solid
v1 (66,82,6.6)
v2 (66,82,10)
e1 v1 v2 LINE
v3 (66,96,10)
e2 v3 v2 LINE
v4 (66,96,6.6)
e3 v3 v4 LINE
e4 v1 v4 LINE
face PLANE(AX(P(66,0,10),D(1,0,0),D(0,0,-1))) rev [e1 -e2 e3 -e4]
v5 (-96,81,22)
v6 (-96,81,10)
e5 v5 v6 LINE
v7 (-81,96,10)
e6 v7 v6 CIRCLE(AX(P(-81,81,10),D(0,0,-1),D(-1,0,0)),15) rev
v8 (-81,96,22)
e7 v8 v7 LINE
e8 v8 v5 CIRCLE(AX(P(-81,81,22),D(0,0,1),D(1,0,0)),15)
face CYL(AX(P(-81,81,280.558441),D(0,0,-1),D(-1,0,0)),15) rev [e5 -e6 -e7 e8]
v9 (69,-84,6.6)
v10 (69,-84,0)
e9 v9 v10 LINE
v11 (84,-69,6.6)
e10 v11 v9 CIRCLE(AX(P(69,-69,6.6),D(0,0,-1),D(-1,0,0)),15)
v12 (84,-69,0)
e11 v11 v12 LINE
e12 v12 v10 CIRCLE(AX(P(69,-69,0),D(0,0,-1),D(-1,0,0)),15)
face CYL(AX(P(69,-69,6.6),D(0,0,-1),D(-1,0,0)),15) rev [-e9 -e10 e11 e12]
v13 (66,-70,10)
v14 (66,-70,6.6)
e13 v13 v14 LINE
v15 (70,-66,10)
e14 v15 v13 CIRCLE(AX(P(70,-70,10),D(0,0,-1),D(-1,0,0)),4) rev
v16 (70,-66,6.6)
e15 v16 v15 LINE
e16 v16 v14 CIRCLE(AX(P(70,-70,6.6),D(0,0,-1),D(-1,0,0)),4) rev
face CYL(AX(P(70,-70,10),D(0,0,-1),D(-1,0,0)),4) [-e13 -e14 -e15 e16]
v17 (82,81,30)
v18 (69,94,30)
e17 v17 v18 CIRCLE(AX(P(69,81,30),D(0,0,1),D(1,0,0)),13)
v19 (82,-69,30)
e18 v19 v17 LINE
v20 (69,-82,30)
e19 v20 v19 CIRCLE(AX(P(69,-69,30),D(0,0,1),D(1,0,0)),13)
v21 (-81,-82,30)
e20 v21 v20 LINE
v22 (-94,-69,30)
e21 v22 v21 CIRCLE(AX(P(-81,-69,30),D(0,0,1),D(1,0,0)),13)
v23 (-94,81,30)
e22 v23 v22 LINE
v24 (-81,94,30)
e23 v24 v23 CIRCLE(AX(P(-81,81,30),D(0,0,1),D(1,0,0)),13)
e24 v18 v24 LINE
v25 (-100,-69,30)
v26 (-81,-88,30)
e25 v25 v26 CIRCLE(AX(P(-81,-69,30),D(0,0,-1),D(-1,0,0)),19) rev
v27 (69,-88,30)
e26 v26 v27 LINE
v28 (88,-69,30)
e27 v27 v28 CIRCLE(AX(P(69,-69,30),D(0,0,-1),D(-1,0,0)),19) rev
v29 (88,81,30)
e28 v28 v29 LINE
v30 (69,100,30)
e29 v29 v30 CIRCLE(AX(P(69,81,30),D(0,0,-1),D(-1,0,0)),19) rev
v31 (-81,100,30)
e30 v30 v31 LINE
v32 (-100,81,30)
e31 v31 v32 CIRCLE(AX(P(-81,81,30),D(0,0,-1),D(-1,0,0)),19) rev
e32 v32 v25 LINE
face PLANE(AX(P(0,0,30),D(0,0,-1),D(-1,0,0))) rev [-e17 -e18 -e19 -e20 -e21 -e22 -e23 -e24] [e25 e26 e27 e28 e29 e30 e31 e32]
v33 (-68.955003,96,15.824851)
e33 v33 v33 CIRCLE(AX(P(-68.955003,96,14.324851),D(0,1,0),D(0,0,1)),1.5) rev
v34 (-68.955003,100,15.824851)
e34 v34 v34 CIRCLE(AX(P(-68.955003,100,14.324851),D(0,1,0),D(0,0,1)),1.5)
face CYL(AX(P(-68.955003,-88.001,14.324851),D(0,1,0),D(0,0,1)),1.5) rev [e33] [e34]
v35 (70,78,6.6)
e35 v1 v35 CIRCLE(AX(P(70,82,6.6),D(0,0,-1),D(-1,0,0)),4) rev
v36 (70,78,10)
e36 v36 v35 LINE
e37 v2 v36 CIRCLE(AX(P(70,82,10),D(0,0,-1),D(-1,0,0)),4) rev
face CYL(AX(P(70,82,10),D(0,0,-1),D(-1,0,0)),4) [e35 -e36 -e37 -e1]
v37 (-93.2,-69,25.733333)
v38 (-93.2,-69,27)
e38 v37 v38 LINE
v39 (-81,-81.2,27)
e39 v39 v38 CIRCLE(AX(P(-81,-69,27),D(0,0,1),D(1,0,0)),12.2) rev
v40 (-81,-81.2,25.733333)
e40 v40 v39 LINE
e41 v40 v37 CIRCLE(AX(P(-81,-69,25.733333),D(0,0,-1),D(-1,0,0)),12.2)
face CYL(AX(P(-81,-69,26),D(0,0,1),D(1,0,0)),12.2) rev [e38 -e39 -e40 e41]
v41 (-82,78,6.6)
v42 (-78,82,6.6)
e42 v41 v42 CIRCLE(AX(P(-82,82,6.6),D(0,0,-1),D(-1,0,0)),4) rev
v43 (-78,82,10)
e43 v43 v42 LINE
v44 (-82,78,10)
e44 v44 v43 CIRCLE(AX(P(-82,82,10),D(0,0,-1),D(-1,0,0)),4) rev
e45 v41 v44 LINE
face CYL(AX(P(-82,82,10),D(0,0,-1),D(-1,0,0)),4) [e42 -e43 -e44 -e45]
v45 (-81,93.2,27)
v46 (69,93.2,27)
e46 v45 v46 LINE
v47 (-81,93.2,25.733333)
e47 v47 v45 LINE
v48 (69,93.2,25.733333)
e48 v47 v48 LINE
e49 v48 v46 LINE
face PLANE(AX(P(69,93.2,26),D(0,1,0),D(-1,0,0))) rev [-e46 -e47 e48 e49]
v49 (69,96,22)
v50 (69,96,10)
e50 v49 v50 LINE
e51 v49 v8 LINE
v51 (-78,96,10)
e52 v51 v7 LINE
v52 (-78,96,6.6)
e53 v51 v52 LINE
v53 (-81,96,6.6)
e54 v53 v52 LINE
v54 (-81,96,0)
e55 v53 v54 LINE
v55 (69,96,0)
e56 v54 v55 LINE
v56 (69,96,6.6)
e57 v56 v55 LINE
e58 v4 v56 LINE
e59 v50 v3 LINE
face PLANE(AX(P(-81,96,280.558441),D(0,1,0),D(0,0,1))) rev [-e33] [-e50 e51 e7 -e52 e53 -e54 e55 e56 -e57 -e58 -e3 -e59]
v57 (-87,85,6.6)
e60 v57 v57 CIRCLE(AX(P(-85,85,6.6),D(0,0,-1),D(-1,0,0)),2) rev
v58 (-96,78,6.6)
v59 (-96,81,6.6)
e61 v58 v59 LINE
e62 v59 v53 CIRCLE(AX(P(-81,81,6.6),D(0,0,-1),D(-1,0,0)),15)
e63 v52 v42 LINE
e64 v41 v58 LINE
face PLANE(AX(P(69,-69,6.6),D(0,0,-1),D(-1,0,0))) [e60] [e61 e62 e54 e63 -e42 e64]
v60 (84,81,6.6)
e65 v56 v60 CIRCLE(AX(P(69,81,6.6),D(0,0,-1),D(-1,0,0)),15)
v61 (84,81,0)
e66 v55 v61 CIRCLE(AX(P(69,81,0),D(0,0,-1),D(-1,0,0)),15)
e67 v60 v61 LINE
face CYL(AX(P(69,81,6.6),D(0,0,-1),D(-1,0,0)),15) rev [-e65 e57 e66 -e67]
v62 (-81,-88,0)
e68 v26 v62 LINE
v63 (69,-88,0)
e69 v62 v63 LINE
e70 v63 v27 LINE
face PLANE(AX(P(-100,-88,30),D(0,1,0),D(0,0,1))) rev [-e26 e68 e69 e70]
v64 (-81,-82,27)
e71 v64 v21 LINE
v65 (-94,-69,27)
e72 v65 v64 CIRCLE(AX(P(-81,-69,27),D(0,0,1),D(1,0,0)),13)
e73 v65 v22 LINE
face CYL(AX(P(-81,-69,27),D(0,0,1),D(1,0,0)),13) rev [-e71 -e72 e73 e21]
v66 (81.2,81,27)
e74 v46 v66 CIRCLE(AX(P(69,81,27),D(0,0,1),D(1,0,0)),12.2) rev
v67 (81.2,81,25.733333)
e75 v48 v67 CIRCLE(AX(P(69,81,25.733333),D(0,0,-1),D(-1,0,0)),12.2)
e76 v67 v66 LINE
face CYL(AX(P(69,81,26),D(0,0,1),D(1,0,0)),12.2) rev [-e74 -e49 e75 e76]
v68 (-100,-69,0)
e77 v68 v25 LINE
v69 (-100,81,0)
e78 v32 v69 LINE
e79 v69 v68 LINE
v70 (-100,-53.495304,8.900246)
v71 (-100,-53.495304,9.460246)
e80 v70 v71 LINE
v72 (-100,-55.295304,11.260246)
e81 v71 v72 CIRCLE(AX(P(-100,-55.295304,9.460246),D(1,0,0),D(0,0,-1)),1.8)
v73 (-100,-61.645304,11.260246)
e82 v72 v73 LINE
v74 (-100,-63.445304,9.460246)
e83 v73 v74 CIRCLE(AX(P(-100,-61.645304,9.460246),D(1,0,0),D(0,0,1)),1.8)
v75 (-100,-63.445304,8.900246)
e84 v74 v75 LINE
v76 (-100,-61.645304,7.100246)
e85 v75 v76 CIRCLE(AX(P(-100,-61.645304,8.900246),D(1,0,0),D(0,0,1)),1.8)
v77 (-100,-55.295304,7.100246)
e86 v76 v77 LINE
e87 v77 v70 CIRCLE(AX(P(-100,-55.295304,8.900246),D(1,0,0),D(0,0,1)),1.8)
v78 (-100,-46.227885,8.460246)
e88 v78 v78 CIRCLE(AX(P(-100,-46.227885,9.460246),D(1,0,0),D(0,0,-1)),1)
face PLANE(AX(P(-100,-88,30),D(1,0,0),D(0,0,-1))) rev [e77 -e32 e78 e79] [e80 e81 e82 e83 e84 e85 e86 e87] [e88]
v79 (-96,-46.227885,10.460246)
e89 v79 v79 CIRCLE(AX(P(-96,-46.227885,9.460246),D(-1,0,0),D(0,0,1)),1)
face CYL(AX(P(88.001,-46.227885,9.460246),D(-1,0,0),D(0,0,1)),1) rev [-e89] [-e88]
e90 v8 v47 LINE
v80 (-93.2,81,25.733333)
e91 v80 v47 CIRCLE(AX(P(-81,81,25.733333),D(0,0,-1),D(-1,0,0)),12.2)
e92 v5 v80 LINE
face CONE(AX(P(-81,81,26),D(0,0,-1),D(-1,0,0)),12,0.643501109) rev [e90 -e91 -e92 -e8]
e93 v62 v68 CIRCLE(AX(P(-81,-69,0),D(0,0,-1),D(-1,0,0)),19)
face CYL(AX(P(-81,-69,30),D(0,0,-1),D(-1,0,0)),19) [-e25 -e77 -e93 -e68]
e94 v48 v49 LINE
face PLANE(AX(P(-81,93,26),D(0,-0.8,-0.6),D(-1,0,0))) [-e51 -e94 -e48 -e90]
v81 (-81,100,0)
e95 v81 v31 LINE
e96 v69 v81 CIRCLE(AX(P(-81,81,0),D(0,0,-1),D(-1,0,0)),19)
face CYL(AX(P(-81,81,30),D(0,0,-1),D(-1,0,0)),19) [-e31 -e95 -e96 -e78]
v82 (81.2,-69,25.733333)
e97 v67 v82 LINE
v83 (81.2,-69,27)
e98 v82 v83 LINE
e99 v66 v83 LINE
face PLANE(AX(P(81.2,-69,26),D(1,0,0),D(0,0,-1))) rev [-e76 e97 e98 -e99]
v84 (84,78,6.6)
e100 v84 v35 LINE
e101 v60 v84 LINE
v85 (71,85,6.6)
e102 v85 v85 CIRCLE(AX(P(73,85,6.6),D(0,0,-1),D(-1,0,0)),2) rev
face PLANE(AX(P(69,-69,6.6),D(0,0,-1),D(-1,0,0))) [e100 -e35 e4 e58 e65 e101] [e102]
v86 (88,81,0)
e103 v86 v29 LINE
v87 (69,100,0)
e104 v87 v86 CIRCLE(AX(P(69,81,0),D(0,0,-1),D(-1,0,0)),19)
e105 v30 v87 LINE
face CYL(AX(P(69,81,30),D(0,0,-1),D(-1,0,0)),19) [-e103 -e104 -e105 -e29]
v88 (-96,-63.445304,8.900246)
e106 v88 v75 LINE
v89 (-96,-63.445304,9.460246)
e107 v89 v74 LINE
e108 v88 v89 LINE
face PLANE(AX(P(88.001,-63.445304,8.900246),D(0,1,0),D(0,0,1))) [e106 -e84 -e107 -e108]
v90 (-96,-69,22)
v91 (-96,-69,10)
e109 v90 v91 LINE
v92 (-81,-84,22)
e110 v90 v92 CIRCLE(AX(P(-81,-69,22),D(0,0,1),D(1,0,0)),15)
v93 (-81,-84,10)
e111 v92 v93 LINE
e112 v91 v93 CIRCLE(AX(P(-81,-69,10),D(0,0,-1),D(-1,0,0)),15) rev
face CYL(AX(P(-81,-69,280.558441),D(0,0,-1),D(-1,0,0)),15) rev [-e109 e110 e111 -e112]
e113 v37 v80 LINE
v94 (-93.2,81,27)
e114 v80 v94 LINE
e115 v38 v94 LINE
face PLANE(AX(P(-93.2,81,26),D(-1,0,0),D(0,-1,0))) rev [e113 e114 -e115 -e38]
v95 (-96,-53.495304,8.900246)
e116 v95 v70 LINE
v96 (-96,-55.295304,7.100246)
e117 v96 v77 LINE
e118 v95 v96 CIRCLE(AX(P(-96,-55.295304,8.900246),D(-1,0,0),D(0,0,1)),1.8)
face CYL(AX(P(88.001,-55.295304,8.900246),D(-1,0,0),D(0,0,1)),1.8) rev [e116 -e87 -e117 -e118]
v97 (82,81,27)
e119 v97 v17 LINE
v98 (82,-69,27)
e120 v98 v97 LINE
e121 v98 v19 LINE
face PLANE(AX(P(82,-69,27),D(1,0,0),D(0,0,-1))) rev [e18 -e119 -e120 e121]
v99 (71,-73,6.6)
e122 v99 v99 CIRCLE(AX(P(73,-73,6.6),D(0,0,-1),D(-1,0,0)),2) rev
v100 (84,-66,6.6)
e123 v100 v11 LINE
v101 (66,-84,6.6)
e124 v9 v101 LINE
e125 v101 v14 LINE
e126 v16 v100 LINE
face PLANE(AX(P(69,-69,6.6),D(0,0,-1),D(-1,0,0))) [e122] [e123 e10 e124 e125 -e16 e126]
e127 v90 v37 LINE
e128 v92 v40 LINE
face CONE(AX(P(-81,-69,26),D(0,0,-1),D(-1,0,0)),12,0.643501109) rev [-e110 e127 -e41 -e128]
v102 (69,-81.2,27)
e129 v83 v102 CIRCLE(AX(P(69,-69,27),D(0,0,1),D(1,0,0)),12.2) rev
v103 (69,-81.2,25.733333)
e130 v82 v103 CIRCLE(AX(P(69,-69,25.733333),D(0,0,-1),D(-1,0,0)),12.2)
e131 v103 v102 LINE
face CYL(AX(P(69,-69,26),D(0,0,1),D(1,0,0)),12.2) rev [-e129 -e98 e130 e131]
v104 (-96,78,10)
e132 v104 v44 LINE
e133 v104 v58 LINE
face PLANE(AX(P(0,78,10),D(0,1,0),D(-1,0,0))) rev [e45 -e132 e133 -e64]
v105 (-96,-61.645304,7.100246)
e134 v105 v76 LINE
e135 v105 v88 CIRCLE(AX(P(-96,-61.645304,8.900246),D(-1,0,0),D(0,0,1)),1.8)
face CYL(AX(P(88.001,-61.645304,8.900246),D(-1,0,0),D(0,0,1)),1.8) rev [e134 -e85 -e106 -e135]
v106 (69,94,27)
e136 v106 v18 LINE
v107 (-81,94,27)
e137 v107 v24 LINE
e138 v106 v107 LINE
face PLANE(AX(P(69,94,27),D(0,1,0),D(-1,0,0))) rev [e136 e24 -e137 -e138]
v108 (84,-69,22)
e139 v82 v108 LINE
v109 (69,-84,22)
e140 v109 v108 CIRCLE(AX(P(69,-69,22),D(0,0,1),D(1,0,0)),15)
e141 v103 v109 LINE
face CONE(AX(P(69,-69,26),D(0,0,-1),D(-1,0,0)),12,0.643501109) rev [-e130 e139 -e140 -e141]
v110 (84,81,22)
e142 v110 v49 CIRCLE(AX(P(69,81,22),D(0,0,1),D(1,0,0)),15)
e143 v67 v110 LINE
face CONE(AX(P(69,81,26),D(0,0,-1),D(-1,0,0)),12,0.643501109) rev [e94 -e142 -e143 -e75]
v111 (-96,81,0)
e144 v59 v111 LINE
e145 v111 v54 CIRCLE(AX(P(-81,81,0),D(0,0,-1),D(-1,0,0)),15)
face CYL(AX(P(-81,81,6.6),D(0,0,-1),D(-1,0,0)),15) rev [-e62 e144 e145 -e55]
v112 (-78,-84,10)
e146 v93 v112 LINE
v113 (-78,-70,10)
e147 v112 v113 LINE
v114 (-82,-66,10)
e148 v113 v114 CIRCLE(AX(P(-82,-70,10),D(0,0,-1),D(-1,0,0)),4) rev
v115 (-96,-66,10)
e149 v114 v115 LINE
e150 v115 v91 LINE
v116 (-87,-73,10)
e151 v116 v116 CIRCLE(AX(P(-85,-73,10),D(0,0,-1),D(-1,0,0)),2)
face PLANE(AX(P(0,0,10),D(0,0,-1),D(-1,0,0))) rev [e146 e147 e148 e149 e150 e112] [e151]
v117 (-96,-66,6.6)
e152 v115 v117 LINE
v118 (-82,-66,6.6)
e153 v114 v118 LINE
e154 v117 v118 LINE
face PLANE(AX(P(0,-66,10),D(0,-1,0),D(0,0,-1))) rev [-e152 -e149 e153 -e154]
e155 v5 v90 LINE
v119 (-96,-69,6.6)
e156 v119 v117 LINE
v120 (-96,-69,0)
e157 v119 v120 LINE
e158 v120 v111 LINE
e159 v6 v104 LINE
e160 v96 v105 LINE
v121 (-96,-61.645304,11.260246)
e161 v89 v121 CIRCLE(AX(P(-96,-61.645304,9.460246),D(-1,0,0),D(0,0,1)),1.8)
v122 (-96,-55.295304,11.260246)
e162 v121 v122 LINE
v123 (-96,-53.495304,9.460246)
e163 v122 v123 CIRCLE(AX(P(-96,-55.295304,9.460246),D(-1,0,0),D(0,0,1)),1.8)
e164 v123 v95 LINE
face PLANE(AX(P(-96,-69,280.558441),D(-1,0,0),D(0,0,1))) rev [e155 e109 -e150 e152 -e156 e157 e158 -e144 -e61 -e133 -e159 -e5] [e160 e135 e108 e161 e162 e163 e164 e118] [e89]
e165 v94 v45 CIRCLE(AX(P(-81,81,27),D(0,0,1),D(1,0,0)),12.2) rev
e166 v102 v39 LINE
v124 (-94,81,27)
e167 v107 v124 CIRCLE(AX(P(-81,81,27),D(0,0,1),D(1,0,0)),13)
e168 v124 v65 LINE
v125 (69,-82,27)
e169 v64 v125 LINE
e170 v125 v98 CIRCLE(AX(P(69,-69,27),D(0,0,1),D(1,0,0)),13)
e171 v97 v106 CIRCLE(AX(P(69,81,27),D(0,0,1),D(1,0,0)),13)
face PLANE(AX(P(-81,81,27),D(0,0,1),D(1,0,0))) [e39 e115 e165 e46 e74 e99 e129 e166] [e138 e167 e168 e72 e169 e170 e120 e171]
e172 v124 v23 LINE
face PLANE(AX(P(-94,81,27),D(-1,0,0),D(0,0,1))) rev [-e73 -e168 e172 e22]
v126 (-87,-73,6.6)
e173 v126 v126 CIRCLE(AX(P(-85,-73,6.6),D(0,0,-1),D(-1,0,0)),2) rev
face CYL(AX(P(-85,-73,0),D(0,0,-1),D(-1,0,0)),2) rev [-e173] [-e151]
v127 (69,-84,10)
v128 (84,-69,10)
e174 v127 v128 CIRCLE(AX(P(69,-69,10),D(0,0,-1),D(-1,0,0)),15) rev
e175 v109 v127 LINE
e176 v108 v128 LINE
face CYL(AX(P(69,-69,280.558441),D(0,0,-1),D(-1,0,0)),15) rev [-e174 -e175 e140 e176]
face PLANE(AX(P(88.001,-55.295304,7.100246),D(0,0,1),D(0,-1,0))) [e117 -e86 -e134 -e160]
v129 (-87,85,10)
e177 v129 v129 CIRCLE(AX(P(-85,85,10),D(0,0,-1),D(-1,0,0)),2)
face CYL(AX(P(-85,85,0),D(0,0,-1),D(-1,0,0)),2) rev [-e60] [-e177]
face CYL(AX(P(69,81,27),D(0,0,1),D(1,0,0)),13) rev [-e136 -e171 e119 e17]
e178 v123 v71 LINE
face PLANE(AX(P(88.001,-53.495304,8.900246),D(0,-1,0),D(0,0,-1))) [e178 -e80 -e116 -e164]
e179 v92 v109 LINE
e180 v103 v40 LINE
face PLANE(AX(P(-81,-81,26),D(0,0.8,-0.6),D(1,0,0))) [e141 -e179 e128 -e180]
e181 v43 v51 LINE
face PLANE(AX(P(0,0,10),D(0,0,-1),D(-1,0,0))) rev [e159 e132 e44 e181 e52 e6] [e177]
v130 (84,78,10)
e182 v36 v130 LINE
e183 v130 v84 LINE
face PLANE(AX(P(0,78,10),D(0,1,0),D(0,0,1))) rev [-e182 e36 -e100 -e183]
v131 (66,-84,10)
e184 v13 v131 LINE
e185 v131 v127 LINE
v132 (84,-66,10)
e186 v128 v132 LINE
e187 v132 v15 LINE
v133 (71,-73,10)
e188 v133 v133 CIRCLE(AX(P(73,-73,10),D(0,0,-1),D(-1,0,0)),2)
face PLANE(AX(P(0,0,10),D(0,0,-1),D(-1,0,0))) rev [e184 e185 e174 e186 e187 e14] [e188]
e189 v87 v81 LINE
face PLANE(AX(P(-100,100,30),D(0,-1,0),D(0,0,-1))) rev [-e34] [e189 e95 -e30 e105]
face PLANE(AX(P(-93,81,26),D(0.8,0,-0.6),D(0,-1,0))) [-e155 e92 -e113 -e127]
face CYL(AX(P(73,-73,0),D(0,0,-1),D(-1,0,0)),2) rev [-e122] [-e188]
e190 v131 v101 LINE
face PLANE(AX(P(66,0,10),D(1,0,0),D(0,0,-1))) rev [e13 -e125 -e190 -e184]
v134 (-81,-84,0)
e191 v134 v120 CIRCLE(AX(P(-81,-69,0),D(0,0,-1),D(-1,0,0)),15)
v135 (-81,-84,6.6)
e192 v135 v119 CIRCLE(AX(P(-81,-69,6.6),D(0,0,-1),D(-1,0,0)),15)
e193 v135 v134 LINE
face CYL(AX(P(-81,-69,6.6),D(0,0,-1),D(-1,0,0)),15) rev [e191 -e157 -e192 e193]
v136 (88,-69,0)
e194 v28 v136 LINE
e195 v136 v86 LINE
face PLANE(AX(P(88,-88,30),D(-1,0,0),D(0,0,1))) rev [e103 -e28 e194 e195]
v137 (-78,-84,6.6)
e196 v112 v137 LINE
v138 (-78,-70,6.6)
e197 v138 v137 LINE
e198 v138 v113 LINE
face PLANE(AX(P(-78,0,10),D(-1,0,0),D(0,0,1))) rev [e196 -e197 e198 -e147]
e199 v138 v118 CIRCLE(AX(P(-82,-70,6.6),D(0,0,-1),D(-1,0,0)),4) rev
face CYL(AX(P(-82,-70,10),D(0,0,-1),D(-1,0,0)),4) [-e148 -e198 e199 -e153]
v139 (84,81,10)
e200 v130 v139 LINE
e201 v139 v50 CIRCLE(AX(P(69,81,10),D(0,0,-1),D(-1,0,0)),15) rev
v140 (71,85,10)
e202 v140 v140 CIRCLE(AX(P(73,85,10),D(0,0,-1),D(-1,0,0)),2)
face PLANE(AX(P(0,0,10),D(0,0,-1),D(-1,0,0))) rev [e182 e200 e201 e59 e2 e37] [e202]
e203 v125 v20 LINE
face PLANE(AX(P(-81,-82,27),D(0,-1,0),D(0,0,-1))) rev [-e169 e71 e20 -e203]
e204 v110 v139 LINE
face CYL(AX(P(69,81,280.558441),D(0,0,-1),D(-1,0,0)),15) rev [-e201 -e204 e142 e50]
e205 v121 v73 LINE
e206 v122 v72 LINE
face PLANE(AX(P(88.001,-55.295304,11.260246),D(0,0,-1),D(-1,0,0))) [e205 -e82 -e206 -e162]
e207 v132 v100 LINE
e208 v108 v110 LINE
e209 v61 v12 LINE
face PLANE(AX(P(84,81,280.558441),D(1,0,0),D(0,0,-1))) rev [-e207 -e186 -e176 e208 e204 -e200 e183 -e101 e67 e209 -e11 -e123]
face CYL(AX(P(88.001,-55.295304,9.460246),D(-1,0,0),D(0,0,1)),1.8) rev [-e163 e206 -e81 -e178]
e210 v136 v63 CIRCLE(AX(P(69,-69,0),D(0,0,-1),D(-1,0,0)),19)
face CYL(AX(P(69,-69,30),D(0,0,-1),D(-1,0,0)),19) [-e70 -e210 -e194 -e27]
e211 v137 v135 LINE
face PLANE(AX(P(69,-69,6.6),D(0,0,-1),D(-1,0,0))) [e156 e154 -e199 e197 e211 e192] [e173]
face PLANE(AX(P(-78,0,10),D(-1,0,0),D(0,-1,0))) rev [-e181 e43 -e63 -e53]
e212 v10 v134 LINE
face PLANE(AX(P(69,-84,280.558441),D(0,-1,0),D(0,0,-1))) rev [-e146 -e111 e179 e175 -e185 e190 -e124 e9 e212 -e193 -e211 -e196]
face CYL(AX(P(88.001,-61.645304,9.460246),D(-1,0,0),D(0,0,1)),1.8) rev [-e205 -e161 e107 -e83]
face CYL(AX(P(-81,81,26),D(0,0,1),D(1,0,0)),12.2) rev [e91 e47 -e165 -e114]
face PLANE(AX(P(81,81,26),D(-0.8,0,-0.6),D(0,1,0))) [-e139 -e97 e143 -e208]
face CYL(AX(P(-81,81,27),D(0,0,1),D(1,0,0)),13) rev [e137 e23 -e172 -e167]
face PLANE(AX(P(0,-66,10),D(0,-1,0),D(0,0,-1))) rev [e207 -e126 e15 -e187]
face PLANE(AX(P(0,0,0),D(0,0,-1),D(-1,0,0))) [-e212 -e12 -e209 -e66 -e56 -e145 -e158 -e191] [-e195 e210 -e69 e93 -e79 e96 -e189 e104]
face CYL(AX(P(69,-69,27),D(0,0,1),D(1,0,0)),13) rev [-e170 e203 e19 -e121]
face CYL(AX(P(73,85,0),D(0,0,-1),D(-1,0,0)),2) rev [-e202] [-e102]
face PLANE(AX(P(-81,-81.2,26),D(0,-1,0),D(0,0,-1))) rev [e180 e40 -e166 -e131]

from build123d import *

# Parameters (mm, degrees)
SKETCH2_W                                 = 188
SKETCH2_H                                 = 188
BOSS_EXTRUDE1_DEPTH                       = 30
FILLET1_R                                 = 19
CUT_EXTRUDE6_DEPTH                        = 4
CUT_EXTRUDE8_SVUOTAMENTO_DEPTH            = 26
CUT_EXTRUDE9_ALLOGGIAMENTO_FINESTRA_DEPTH = 3
BOSS_EXTRUDE2_DEPTH                       = 10
FILLET4_R                                 = 4
F_4_0MM_DOWEL_HOLE2_D                     = 4
CUT_EXTRUDE10_DEPTH                       = 6.6
CUT_EXTRUDE4_REACH                        = 217.044
SKETCH11_R                                = 1.5
CUT_EXTRUDE5_REACH                        = 217.044
SKETCH15_R                                = 1
CHAMFER1_SIZE                             = 4
CHAMFER1_SIZE_2                           = 3


with BuildPart() as part:
    # Sketch2 → Boss-Extrude1 (new body)
    with BuildSketch(Plane.XY):
        with Locations((-6, 6)):
            Rectangle(SKETCH2_W, SKETCH2_H)
    extrude(amount=BOSS_EXTRUDE1_DEPTH)

    # Fillet1
    fillet1_edges = [part.edges().sort_by_distance(p)[0] for p in [
        (88, -88, 15),
        (-100, -88, 15),
        (-100, 100, 15),
        (88, 100, 15),
    ]]
    fillet(fillet1_edges, radius=FILLET1_R)

    # Sketch18 → Cut-Extrude6 (cut)
    with BuildSketch(Plane.XY.offset(30)):
        with BuildLine():
            Line((-93.2, 81), (-93.2, -69))
            ThreePointArc((-93.2, -69), (-89.62670273, -77.62670273), (-81, -81.2))
            Line((-81, -81.2), (69, -81.2))
            ThreePointArc((69, -81.2), (77.62670273, -77.62670273), (81.2, -69))
            Line((81.2, -69), (81.2, 81))
            ThreePointArc((81.2, 81), (77.62670273, 89.62670273), (69, 93.2))
            Line((69, 93.2), (-81, 93.2))
            ThreePointArc((-81, 93.2), (-89.62670273, 89.62670273), (-93.2, 81))
        make_face()
    extrude(amount=-CUT_EXTRUDE6_DEPTH, mode=Mode.SUBTRACT)

    # Sketch19 → Cut-Extrude8-svuotamento (cut)
    with BuildSketch(Plane(origin=(0, 0, 0), x_dir=(-1, 0, 0), z_dir=(0, 0, -1))):
        with BuildLine():
            Line((-69, -84), (81, -84))
            ThreePointArc((81, -84), (91.606601718, -79.606601718), (96, -69))
            Line((96, -69), (96, 81))
            ThreePointArc((96, 81), (91.606601718, 91.606601718), (81, 96))
            Line((81, 96), (-69, 96))
            ThreePointArc((-69, 96), (-79.606601718, 91.606601718), (-84, 81))
            Line((-84, 81), (-84, -69))
            ThreePointArc((-84, -69), (-79.606601718, -79.606601718), (-69, -84))
        make_face()
    extrude(amount=-CUT_EXTRUDE8_SVUOTAMENTO_DEPTH, mode=Mode.SUBTRACT)

    # Sketch20 → Cut-Extrude9-alloggiamento-finestra (cut)
    with BuildSketch(Plane.XY.offset(30)):
        with BuildLine():
            Line((-94, 81), (-94, -69))
            ThreePointArc((-94, -69), (-90.192388155, -78.192388155), (-81, -82))
            Line((-81, -82), (69, -82))
            ThreePointArc((69, -82), (78.192388155, -78.192388155), (82, -69))
            Line((82, -69), (82, 81))
            ThreePointArc((82, 81), (78.192388155, 90.192388155), (69, 94))
            Line((69, 94), (-81, 94))
            ThreePointArc((-81, 94), (-90.192388155, 90.192388155), (-94, 81))
        make_face()
    extrude(amount=-CUT_EXTRUDE9_ALLOGGIAMENTO_FINESTRA_DEPTH, mode=Mode.SUBTRACT)

    # Sketch22 → Boss-Extrude2 (add)
    with BuildSketch(Plane(origin=(0, 0, 0), x_dir=(-1, 0, 0), z_dir=(0, 0, -1))):
        with BuildLine():
            Line((-84, 78), (-66, 78))
            Line((-66, 78), (-66, 96))
            Line((-66, 96), (-69, 96))
            ThreePointArc((-69, 96), (-79.606601718, 91.606601718), (-84, 81))
            Line((-84, 81), (-84, 78))
        make_face()
        with BuildLine():
            Line((81, 96), (78, 96))
            Line((78, 96), (78, 78))
            Line((78, 78), (96, 78))
            Line((96, 78), (96, 81))
            ThreePointArc((96, 81), (91.606601718, 91.606601718), (81, 96))
        make_face()
        with BuildLine():
            Line((78, -66), (78, -84))
            Line((78, -84), (81, -84))
            ThreePointArc((81, -84), (91.606601718, -79.606601718), (96, -69))
            Line((96, -69), (96, -66))
            Line((96, -66), (78, -66))
        make_face()
        with BuildLine():
            Line((-66, -66), (-84, -66))
            Line((-84, -66), (-84, -69))
            ThreePointArc((-84, -69), (-79.606601718, -79.606601718), (-69, -84))
            Line((-69, -84), (-66, -84))
            Line((-66, -84), (-66, -66))
        make_face()
    extrude(amount=-BOSS_EXTRUDE2_DEPTH)

    # Fillet4
    fillet4_edges = [part.edges().sort_by_distance(p)[0] for p in [
        (66, 78, 5),
        (-78, 78, 5),
        (-78, -66, 5),
        (66, -66, 5),
    ]]
    fillet(fillet4_edges, radius=FILLET4_R)

    # Ø4.0mm Dowel Hole2 (through all)
    with Locations(Plane(origin=(0, 0, 0), x_dir=(-1, 0, 0), z_dir=(0, 0, -1))):
        with Locations((-73, 85), (85, 85), (85, -73), (-73, -73)):
            Hole(F_4_0MM_DOWEL_HOLE2_D / 2)

    # Sketch30 → Cut-Extrude10 (cut)
    with BuildSketch(Plane(origin=(0, 0, 0), x_dir=(-1, 0, 0), z_dir=(0, 0, -1))):
        with BuildLine():
            Line((-69, -84), (81, -84))
            ThreePointArc((81, -84), (91.606601718, -79.606601718), (96, -69))
            Line((96, -69), (96, 81))
            ThreePointArc((96, 81), (91.606601718, 91.606601718), (81, 96))
            Line((81, 96), (-69, 96))
            ThreePointArc((-69, 96), (-79.606601718, 91.606601718), (-84, 81))
            Line((-84, 81), (-84, -69))
            ThreePointArc((-84, -69), (-79.606601718, -79.606601718), (-69, -84))
        make_face()
    extrude(amount=-CUT_EXTRUDE10_DEPTH, mode=Mode.SUBTRACT)

    # Sketch11 → Cut-Extrude4 (cut, up to next)
    with BuildSketch(Plane(origin=(0, 100, 0), x_dir=(1, 0, 0), z_dir=(0, 1, 0)), mode=Mode.PRIVATE) as cut_extrude4_sk1:
        with Locations(Location((-68.95500318, -14.324851484, 0), (0, 0, 270))):
            Circle(SKETCH11_R)
    cut_extrude4_tool1 = extrude(cut_extrude4_sk1.sketch, amount=-CUT_EXTRUDE4_REACH, mode=Mode.PRIVATE) & part.part
    add(cut_extrude4_tool1.solids().sort_by_distance((-68.955003, 100, 14.324851))[0], mode=Mode.SUBTRACT)

    # Sketch15 → Cut-Extrude5 (cut, up to next)
    with BuildSketch(Plane(origin=(-100, 0, 0), x_dir=(0, 0, -1), z_dir=(1, 0, 0)), mode=Mode.PRIVATE) as cut_extrude5_sk1:
        with Locations(Location((-9.460245724, -46.22788492, 0), (0, 0, 180))):
            Circle(SKETCH15_R)
    cut_extrude5_tool1 = extrude(cut_extrude5_sk1.sketch, amount=CUT_EXTRUDE5_REACH, mode=Mode.PRIVATE) & part.part
    # Sketch15 → Cut-Extrude5 (cut, up to next)
    with BuildSketch(Plane(origin=(-100, 0, 0), x_dir=(0, 0, -1), z_dir=(1, 0, 0)), mode=Mode.PRIVATE) as cut_extrude5_sk2:
        with BuildLine():
            Line((-8.900245724, -53.495303579), (-9.460245724, -53.495303579))
            ThreePointArc((-9.460245724, -53.495303579), (-10.73303793, -54.022511373), (-11.260245724, -55.295303579))
            Line((-11.260245724, -55.295303579), (-11.260245724, -61.645303576))
            ThreePointArc((-11.260245724, -61.645303576), (-10.73303793, -62.918095782), (-9.460245724, -63.445303576))
            Line((-9.460245724, -63.445303576), (-8.900245724, -63.445303576))
            ThreePointArc((-8.900245724, -63.445303576), (-7.627453518, -62.918095782), (-7.100245724, -61.645303576))
            Line((-7.100245724, -61.645303576), (-7.100245724, -55.295303579))
            ThreePointArc((-7.100245724, -55.295303579), (-7.627453518, -54.022511373), (-8.900245724, -53.495303579))
        make_face()
    cut_extrude5_tool2 = extrude(cut_extrude5_sk2.sketch, amount=CUT_EXTRUDE5_REACH, mode=Mode.PRIVATE) & part.part
    add(cut_extrude5_tool1.solids().sort_by_distance((-100, -46.227885, 9.460246))[0], mode=Mode.SUBTRACT)
    add(cut_extrude5_tool2.solids().sort_by_distance((-100, -58.470304, 9.180246))[0], mode=Mode.SUBTRACT)

    # Chamfer1
    # the kernel refuses this chamfer: 4, 3 mm, written as the material it adds along each edge
    with BuildSketch(Plane(origin=(69, -84, 26), x_dir=(0, -0.023249527748764737, -0.9997296931968459), z_dir=(-1, 0, 0))) as chamfer1_piece_1_section:
        Polygon((CHAMFER1_SIZE * 0.999729693197, -CHAMFER1_SIZE * 0.0232495277488), (-CHAMFER1_SIZE_2 * 0.0232495277488, -CHAMFER1_SIZE_2 * 0.999729693197), (0, 0), align=None)
    chamfer1_piece_1 = extrude(amount=150, mode=Mode.PRIVATE)
    chamfer1_piece_1 = split(chamfer1_piece_1, bisect_by=Plane(origin=(-6, -81.2, 24.654371932), z_dir=(0, -1, 0)), keep=Keep.TOP, mode=Mode.PRIVATE)
    add(chamfer1_piece_1)
    with BuildSketch(Plane(origin=(-81, -69, 26), x_dir=(0, -1, 0), z_dir=(1, 0, 0))) as chamfer1_piece_2_section:
        Polygon((15 - CHAMFER1_SIZE_2, 0), (15, CHAMFER1_SIZE), (15, 0), align=None)
    chamfer1_piece_2 = revolve(axis=Axis((-81, -69, 26), (0, 0, -1)), revolution_arc=90, mode=Mode.PRIVATE)
    chamfer1_piece_2 = chamfer1_piece_2 - Plane(origin=(-81, -69, 24.826857266), x_dir=(-1, 0, 0), z_dir=(0, 0, 1)) * Cylinder(12.2, 60, mode=Mode.PRIVATE)
    add(chamfer1_piece_2)
    with BuildSketch(Plane(origin=(69, -69, 26), x_dir=(1, 0, 0), z_dir=(0, 1, 0))) as chamfer1_piece_3_section:
        Polygon((15 - CHAMFER1_SIZE_2, 0), (15, CHAMFER1_SIZE), (15, 0), align=None)
    chamfer1_piece_3 = revolve(axis=Axis((69, -69, 26), (0, 0, -1)), revolution_arc=90, mode=Mode.PRIVATE)
    chamfer1_piece_3 = chamfer1_piece_3 - Plane(origin=(69, -69, 24.826857266), x_dir=(0, -1, 0), z_dir=(0, 0, 1)) * Cylinder(12.2, 60, mode=Mode.PRIVATE)
    add(chamfer1_piece_3)
    with BuildSketch(Plane(origin=(-96, -69, 26), x_dir=(-0.023249527748764737, 0, -0.9997296931968459), z_dir=(0, 1, 0))) as chamfer1_piece_4_section:
        Polygon((CHAMFER1_SIZE * 0.999729693197, -CHAMFER1_SIZE * 0.0232495277488), (-CHAMFER1_SIZE_2 * 0.0232495277488, -CHAMFER1_SIZE_2 * 0.999729693197), (0, 0), align=None)
    chamfer1_piece_4 = extrude(amount=150, mode=Mode.PRIVATE)
    chamfer1_piece_4 = split(chamfer1_piece_4, bisect_by=Plane(origin=(-93.2, 6, 24.654371932), z_dir=(-1, 0, 0)), keep=Keep.TOP, mode=Mode.PRIVATE)
    add(chamfer1_piece_4)
    with BuildSketch(Plane(origin=(84, 81, 26), x_dir=(0.023249527748764737, 0, -0.9997296931968459), z_dir=(0, -1, 0))) as chamfer1_piece_5_section:
        Polygon((CHAMFER1_SIZE * 0.999729693197, -CHAMFER1_SIZE * 0.0232495277488), (-CHAMFER1_SIZE_2 * 0.0232495277488, -CHAMFER1_SIZE_2 * 0.999729693197), (0, 0), align=None)
    chamfer1_piece_5 = extrude(amount=150, mode=Mode.PRIVATE)
    chamfer1_piece_5 = split(chamfer1_piece_5, bisect_by=Plane(origin=(81.2, 6, 24.654371932), z_dir=(1, 0, 0)), keep=Keep.TOP, mode=Mode.PRIVATE)
    add(chamfer1_piece_5)
    with BuildSketch(Plane(origin=(-81, 81, 26), x_dir=(-1, 0, 0), z_dir=(0, -1, 0))) as chamfer1_piece_6_section:
        Polygon((15 - CHAMFER1_SIZE_2, 0), (15, CHAMFER1_SIZE), (15, 0), align=None)
    chamfer1_piece_6 = revolve(axis=Axis((-81, 81, 26), (0, 0, -1)), revolution_arc=90, mode=Mode.PRIVATE)
    chamfer1_piece_6 = chamfer1_piece_6 - Plane(origin=(-81, 81, 24.826857266), x_dir=(0, 1, 0), z_dir=(0, 0, 1)) * Cylinder(12.2, 61, mode=Mode.PRIVATE)
    add(chamfer1_piece_6)
    with BuildSketch(Plane(origin=(69, 81, 26), x_dir=(0, 1, 0), z_dir=(-1, 0, 0))) as chamfer1_piece_7_section:
        Polygon((15, CHAMFER1_SIZE), (15 - CHAMFER1_SIZE_2, 0), (15, 0), align=None)
    chamfer1_piece_7 = revolve(axis=Axis((69, 81, 26), (0, 0, -1)), revolution_arc=90, mode=Mode.PRIVATE)
    chamfer1_piece_7 = chamfer1_piece_7 - Plane(origin=(69, 81, 24.516674107), x_dir=(1, 0, 0), z_dir=(0, 0, 1)) * Cylinder(12.2, 61, mode=Mode.PRIVATE)
    add(chamfer1_piece_7)
    with BuildSketch(Plane(origin=(-81, 96, 26), x_dir=(0, 0.023249527748764737, -0.9997296931968459), z_dir=(1, 0, 0))) as chamfer1_piece_8_section:
        Polygon((CHAMFER1_SIZE * 0.999729693197, -CHAMFER1_SIZE * 0.0232495277488), (-CHAMFER1_SIZE_2 * 0.0232495277488, -CHAMFER1_SIZE_2 * 0.999729693197), (0, 0), align=None)
    chamfer1_piece_8 = extrude(amount=150, mode=Mode.PRIVATE)
    chamfer1_piece_8 = split(chamfer1_piece_8, bisect_by=Plane(origin=(-6, 93.2, 24.654371932), z_dir=(0, 1, 0)), keep=Keep.TOP, mode=Mode.PRIVATE)
    add(chamfer1_piece_8)


solid = part.part
